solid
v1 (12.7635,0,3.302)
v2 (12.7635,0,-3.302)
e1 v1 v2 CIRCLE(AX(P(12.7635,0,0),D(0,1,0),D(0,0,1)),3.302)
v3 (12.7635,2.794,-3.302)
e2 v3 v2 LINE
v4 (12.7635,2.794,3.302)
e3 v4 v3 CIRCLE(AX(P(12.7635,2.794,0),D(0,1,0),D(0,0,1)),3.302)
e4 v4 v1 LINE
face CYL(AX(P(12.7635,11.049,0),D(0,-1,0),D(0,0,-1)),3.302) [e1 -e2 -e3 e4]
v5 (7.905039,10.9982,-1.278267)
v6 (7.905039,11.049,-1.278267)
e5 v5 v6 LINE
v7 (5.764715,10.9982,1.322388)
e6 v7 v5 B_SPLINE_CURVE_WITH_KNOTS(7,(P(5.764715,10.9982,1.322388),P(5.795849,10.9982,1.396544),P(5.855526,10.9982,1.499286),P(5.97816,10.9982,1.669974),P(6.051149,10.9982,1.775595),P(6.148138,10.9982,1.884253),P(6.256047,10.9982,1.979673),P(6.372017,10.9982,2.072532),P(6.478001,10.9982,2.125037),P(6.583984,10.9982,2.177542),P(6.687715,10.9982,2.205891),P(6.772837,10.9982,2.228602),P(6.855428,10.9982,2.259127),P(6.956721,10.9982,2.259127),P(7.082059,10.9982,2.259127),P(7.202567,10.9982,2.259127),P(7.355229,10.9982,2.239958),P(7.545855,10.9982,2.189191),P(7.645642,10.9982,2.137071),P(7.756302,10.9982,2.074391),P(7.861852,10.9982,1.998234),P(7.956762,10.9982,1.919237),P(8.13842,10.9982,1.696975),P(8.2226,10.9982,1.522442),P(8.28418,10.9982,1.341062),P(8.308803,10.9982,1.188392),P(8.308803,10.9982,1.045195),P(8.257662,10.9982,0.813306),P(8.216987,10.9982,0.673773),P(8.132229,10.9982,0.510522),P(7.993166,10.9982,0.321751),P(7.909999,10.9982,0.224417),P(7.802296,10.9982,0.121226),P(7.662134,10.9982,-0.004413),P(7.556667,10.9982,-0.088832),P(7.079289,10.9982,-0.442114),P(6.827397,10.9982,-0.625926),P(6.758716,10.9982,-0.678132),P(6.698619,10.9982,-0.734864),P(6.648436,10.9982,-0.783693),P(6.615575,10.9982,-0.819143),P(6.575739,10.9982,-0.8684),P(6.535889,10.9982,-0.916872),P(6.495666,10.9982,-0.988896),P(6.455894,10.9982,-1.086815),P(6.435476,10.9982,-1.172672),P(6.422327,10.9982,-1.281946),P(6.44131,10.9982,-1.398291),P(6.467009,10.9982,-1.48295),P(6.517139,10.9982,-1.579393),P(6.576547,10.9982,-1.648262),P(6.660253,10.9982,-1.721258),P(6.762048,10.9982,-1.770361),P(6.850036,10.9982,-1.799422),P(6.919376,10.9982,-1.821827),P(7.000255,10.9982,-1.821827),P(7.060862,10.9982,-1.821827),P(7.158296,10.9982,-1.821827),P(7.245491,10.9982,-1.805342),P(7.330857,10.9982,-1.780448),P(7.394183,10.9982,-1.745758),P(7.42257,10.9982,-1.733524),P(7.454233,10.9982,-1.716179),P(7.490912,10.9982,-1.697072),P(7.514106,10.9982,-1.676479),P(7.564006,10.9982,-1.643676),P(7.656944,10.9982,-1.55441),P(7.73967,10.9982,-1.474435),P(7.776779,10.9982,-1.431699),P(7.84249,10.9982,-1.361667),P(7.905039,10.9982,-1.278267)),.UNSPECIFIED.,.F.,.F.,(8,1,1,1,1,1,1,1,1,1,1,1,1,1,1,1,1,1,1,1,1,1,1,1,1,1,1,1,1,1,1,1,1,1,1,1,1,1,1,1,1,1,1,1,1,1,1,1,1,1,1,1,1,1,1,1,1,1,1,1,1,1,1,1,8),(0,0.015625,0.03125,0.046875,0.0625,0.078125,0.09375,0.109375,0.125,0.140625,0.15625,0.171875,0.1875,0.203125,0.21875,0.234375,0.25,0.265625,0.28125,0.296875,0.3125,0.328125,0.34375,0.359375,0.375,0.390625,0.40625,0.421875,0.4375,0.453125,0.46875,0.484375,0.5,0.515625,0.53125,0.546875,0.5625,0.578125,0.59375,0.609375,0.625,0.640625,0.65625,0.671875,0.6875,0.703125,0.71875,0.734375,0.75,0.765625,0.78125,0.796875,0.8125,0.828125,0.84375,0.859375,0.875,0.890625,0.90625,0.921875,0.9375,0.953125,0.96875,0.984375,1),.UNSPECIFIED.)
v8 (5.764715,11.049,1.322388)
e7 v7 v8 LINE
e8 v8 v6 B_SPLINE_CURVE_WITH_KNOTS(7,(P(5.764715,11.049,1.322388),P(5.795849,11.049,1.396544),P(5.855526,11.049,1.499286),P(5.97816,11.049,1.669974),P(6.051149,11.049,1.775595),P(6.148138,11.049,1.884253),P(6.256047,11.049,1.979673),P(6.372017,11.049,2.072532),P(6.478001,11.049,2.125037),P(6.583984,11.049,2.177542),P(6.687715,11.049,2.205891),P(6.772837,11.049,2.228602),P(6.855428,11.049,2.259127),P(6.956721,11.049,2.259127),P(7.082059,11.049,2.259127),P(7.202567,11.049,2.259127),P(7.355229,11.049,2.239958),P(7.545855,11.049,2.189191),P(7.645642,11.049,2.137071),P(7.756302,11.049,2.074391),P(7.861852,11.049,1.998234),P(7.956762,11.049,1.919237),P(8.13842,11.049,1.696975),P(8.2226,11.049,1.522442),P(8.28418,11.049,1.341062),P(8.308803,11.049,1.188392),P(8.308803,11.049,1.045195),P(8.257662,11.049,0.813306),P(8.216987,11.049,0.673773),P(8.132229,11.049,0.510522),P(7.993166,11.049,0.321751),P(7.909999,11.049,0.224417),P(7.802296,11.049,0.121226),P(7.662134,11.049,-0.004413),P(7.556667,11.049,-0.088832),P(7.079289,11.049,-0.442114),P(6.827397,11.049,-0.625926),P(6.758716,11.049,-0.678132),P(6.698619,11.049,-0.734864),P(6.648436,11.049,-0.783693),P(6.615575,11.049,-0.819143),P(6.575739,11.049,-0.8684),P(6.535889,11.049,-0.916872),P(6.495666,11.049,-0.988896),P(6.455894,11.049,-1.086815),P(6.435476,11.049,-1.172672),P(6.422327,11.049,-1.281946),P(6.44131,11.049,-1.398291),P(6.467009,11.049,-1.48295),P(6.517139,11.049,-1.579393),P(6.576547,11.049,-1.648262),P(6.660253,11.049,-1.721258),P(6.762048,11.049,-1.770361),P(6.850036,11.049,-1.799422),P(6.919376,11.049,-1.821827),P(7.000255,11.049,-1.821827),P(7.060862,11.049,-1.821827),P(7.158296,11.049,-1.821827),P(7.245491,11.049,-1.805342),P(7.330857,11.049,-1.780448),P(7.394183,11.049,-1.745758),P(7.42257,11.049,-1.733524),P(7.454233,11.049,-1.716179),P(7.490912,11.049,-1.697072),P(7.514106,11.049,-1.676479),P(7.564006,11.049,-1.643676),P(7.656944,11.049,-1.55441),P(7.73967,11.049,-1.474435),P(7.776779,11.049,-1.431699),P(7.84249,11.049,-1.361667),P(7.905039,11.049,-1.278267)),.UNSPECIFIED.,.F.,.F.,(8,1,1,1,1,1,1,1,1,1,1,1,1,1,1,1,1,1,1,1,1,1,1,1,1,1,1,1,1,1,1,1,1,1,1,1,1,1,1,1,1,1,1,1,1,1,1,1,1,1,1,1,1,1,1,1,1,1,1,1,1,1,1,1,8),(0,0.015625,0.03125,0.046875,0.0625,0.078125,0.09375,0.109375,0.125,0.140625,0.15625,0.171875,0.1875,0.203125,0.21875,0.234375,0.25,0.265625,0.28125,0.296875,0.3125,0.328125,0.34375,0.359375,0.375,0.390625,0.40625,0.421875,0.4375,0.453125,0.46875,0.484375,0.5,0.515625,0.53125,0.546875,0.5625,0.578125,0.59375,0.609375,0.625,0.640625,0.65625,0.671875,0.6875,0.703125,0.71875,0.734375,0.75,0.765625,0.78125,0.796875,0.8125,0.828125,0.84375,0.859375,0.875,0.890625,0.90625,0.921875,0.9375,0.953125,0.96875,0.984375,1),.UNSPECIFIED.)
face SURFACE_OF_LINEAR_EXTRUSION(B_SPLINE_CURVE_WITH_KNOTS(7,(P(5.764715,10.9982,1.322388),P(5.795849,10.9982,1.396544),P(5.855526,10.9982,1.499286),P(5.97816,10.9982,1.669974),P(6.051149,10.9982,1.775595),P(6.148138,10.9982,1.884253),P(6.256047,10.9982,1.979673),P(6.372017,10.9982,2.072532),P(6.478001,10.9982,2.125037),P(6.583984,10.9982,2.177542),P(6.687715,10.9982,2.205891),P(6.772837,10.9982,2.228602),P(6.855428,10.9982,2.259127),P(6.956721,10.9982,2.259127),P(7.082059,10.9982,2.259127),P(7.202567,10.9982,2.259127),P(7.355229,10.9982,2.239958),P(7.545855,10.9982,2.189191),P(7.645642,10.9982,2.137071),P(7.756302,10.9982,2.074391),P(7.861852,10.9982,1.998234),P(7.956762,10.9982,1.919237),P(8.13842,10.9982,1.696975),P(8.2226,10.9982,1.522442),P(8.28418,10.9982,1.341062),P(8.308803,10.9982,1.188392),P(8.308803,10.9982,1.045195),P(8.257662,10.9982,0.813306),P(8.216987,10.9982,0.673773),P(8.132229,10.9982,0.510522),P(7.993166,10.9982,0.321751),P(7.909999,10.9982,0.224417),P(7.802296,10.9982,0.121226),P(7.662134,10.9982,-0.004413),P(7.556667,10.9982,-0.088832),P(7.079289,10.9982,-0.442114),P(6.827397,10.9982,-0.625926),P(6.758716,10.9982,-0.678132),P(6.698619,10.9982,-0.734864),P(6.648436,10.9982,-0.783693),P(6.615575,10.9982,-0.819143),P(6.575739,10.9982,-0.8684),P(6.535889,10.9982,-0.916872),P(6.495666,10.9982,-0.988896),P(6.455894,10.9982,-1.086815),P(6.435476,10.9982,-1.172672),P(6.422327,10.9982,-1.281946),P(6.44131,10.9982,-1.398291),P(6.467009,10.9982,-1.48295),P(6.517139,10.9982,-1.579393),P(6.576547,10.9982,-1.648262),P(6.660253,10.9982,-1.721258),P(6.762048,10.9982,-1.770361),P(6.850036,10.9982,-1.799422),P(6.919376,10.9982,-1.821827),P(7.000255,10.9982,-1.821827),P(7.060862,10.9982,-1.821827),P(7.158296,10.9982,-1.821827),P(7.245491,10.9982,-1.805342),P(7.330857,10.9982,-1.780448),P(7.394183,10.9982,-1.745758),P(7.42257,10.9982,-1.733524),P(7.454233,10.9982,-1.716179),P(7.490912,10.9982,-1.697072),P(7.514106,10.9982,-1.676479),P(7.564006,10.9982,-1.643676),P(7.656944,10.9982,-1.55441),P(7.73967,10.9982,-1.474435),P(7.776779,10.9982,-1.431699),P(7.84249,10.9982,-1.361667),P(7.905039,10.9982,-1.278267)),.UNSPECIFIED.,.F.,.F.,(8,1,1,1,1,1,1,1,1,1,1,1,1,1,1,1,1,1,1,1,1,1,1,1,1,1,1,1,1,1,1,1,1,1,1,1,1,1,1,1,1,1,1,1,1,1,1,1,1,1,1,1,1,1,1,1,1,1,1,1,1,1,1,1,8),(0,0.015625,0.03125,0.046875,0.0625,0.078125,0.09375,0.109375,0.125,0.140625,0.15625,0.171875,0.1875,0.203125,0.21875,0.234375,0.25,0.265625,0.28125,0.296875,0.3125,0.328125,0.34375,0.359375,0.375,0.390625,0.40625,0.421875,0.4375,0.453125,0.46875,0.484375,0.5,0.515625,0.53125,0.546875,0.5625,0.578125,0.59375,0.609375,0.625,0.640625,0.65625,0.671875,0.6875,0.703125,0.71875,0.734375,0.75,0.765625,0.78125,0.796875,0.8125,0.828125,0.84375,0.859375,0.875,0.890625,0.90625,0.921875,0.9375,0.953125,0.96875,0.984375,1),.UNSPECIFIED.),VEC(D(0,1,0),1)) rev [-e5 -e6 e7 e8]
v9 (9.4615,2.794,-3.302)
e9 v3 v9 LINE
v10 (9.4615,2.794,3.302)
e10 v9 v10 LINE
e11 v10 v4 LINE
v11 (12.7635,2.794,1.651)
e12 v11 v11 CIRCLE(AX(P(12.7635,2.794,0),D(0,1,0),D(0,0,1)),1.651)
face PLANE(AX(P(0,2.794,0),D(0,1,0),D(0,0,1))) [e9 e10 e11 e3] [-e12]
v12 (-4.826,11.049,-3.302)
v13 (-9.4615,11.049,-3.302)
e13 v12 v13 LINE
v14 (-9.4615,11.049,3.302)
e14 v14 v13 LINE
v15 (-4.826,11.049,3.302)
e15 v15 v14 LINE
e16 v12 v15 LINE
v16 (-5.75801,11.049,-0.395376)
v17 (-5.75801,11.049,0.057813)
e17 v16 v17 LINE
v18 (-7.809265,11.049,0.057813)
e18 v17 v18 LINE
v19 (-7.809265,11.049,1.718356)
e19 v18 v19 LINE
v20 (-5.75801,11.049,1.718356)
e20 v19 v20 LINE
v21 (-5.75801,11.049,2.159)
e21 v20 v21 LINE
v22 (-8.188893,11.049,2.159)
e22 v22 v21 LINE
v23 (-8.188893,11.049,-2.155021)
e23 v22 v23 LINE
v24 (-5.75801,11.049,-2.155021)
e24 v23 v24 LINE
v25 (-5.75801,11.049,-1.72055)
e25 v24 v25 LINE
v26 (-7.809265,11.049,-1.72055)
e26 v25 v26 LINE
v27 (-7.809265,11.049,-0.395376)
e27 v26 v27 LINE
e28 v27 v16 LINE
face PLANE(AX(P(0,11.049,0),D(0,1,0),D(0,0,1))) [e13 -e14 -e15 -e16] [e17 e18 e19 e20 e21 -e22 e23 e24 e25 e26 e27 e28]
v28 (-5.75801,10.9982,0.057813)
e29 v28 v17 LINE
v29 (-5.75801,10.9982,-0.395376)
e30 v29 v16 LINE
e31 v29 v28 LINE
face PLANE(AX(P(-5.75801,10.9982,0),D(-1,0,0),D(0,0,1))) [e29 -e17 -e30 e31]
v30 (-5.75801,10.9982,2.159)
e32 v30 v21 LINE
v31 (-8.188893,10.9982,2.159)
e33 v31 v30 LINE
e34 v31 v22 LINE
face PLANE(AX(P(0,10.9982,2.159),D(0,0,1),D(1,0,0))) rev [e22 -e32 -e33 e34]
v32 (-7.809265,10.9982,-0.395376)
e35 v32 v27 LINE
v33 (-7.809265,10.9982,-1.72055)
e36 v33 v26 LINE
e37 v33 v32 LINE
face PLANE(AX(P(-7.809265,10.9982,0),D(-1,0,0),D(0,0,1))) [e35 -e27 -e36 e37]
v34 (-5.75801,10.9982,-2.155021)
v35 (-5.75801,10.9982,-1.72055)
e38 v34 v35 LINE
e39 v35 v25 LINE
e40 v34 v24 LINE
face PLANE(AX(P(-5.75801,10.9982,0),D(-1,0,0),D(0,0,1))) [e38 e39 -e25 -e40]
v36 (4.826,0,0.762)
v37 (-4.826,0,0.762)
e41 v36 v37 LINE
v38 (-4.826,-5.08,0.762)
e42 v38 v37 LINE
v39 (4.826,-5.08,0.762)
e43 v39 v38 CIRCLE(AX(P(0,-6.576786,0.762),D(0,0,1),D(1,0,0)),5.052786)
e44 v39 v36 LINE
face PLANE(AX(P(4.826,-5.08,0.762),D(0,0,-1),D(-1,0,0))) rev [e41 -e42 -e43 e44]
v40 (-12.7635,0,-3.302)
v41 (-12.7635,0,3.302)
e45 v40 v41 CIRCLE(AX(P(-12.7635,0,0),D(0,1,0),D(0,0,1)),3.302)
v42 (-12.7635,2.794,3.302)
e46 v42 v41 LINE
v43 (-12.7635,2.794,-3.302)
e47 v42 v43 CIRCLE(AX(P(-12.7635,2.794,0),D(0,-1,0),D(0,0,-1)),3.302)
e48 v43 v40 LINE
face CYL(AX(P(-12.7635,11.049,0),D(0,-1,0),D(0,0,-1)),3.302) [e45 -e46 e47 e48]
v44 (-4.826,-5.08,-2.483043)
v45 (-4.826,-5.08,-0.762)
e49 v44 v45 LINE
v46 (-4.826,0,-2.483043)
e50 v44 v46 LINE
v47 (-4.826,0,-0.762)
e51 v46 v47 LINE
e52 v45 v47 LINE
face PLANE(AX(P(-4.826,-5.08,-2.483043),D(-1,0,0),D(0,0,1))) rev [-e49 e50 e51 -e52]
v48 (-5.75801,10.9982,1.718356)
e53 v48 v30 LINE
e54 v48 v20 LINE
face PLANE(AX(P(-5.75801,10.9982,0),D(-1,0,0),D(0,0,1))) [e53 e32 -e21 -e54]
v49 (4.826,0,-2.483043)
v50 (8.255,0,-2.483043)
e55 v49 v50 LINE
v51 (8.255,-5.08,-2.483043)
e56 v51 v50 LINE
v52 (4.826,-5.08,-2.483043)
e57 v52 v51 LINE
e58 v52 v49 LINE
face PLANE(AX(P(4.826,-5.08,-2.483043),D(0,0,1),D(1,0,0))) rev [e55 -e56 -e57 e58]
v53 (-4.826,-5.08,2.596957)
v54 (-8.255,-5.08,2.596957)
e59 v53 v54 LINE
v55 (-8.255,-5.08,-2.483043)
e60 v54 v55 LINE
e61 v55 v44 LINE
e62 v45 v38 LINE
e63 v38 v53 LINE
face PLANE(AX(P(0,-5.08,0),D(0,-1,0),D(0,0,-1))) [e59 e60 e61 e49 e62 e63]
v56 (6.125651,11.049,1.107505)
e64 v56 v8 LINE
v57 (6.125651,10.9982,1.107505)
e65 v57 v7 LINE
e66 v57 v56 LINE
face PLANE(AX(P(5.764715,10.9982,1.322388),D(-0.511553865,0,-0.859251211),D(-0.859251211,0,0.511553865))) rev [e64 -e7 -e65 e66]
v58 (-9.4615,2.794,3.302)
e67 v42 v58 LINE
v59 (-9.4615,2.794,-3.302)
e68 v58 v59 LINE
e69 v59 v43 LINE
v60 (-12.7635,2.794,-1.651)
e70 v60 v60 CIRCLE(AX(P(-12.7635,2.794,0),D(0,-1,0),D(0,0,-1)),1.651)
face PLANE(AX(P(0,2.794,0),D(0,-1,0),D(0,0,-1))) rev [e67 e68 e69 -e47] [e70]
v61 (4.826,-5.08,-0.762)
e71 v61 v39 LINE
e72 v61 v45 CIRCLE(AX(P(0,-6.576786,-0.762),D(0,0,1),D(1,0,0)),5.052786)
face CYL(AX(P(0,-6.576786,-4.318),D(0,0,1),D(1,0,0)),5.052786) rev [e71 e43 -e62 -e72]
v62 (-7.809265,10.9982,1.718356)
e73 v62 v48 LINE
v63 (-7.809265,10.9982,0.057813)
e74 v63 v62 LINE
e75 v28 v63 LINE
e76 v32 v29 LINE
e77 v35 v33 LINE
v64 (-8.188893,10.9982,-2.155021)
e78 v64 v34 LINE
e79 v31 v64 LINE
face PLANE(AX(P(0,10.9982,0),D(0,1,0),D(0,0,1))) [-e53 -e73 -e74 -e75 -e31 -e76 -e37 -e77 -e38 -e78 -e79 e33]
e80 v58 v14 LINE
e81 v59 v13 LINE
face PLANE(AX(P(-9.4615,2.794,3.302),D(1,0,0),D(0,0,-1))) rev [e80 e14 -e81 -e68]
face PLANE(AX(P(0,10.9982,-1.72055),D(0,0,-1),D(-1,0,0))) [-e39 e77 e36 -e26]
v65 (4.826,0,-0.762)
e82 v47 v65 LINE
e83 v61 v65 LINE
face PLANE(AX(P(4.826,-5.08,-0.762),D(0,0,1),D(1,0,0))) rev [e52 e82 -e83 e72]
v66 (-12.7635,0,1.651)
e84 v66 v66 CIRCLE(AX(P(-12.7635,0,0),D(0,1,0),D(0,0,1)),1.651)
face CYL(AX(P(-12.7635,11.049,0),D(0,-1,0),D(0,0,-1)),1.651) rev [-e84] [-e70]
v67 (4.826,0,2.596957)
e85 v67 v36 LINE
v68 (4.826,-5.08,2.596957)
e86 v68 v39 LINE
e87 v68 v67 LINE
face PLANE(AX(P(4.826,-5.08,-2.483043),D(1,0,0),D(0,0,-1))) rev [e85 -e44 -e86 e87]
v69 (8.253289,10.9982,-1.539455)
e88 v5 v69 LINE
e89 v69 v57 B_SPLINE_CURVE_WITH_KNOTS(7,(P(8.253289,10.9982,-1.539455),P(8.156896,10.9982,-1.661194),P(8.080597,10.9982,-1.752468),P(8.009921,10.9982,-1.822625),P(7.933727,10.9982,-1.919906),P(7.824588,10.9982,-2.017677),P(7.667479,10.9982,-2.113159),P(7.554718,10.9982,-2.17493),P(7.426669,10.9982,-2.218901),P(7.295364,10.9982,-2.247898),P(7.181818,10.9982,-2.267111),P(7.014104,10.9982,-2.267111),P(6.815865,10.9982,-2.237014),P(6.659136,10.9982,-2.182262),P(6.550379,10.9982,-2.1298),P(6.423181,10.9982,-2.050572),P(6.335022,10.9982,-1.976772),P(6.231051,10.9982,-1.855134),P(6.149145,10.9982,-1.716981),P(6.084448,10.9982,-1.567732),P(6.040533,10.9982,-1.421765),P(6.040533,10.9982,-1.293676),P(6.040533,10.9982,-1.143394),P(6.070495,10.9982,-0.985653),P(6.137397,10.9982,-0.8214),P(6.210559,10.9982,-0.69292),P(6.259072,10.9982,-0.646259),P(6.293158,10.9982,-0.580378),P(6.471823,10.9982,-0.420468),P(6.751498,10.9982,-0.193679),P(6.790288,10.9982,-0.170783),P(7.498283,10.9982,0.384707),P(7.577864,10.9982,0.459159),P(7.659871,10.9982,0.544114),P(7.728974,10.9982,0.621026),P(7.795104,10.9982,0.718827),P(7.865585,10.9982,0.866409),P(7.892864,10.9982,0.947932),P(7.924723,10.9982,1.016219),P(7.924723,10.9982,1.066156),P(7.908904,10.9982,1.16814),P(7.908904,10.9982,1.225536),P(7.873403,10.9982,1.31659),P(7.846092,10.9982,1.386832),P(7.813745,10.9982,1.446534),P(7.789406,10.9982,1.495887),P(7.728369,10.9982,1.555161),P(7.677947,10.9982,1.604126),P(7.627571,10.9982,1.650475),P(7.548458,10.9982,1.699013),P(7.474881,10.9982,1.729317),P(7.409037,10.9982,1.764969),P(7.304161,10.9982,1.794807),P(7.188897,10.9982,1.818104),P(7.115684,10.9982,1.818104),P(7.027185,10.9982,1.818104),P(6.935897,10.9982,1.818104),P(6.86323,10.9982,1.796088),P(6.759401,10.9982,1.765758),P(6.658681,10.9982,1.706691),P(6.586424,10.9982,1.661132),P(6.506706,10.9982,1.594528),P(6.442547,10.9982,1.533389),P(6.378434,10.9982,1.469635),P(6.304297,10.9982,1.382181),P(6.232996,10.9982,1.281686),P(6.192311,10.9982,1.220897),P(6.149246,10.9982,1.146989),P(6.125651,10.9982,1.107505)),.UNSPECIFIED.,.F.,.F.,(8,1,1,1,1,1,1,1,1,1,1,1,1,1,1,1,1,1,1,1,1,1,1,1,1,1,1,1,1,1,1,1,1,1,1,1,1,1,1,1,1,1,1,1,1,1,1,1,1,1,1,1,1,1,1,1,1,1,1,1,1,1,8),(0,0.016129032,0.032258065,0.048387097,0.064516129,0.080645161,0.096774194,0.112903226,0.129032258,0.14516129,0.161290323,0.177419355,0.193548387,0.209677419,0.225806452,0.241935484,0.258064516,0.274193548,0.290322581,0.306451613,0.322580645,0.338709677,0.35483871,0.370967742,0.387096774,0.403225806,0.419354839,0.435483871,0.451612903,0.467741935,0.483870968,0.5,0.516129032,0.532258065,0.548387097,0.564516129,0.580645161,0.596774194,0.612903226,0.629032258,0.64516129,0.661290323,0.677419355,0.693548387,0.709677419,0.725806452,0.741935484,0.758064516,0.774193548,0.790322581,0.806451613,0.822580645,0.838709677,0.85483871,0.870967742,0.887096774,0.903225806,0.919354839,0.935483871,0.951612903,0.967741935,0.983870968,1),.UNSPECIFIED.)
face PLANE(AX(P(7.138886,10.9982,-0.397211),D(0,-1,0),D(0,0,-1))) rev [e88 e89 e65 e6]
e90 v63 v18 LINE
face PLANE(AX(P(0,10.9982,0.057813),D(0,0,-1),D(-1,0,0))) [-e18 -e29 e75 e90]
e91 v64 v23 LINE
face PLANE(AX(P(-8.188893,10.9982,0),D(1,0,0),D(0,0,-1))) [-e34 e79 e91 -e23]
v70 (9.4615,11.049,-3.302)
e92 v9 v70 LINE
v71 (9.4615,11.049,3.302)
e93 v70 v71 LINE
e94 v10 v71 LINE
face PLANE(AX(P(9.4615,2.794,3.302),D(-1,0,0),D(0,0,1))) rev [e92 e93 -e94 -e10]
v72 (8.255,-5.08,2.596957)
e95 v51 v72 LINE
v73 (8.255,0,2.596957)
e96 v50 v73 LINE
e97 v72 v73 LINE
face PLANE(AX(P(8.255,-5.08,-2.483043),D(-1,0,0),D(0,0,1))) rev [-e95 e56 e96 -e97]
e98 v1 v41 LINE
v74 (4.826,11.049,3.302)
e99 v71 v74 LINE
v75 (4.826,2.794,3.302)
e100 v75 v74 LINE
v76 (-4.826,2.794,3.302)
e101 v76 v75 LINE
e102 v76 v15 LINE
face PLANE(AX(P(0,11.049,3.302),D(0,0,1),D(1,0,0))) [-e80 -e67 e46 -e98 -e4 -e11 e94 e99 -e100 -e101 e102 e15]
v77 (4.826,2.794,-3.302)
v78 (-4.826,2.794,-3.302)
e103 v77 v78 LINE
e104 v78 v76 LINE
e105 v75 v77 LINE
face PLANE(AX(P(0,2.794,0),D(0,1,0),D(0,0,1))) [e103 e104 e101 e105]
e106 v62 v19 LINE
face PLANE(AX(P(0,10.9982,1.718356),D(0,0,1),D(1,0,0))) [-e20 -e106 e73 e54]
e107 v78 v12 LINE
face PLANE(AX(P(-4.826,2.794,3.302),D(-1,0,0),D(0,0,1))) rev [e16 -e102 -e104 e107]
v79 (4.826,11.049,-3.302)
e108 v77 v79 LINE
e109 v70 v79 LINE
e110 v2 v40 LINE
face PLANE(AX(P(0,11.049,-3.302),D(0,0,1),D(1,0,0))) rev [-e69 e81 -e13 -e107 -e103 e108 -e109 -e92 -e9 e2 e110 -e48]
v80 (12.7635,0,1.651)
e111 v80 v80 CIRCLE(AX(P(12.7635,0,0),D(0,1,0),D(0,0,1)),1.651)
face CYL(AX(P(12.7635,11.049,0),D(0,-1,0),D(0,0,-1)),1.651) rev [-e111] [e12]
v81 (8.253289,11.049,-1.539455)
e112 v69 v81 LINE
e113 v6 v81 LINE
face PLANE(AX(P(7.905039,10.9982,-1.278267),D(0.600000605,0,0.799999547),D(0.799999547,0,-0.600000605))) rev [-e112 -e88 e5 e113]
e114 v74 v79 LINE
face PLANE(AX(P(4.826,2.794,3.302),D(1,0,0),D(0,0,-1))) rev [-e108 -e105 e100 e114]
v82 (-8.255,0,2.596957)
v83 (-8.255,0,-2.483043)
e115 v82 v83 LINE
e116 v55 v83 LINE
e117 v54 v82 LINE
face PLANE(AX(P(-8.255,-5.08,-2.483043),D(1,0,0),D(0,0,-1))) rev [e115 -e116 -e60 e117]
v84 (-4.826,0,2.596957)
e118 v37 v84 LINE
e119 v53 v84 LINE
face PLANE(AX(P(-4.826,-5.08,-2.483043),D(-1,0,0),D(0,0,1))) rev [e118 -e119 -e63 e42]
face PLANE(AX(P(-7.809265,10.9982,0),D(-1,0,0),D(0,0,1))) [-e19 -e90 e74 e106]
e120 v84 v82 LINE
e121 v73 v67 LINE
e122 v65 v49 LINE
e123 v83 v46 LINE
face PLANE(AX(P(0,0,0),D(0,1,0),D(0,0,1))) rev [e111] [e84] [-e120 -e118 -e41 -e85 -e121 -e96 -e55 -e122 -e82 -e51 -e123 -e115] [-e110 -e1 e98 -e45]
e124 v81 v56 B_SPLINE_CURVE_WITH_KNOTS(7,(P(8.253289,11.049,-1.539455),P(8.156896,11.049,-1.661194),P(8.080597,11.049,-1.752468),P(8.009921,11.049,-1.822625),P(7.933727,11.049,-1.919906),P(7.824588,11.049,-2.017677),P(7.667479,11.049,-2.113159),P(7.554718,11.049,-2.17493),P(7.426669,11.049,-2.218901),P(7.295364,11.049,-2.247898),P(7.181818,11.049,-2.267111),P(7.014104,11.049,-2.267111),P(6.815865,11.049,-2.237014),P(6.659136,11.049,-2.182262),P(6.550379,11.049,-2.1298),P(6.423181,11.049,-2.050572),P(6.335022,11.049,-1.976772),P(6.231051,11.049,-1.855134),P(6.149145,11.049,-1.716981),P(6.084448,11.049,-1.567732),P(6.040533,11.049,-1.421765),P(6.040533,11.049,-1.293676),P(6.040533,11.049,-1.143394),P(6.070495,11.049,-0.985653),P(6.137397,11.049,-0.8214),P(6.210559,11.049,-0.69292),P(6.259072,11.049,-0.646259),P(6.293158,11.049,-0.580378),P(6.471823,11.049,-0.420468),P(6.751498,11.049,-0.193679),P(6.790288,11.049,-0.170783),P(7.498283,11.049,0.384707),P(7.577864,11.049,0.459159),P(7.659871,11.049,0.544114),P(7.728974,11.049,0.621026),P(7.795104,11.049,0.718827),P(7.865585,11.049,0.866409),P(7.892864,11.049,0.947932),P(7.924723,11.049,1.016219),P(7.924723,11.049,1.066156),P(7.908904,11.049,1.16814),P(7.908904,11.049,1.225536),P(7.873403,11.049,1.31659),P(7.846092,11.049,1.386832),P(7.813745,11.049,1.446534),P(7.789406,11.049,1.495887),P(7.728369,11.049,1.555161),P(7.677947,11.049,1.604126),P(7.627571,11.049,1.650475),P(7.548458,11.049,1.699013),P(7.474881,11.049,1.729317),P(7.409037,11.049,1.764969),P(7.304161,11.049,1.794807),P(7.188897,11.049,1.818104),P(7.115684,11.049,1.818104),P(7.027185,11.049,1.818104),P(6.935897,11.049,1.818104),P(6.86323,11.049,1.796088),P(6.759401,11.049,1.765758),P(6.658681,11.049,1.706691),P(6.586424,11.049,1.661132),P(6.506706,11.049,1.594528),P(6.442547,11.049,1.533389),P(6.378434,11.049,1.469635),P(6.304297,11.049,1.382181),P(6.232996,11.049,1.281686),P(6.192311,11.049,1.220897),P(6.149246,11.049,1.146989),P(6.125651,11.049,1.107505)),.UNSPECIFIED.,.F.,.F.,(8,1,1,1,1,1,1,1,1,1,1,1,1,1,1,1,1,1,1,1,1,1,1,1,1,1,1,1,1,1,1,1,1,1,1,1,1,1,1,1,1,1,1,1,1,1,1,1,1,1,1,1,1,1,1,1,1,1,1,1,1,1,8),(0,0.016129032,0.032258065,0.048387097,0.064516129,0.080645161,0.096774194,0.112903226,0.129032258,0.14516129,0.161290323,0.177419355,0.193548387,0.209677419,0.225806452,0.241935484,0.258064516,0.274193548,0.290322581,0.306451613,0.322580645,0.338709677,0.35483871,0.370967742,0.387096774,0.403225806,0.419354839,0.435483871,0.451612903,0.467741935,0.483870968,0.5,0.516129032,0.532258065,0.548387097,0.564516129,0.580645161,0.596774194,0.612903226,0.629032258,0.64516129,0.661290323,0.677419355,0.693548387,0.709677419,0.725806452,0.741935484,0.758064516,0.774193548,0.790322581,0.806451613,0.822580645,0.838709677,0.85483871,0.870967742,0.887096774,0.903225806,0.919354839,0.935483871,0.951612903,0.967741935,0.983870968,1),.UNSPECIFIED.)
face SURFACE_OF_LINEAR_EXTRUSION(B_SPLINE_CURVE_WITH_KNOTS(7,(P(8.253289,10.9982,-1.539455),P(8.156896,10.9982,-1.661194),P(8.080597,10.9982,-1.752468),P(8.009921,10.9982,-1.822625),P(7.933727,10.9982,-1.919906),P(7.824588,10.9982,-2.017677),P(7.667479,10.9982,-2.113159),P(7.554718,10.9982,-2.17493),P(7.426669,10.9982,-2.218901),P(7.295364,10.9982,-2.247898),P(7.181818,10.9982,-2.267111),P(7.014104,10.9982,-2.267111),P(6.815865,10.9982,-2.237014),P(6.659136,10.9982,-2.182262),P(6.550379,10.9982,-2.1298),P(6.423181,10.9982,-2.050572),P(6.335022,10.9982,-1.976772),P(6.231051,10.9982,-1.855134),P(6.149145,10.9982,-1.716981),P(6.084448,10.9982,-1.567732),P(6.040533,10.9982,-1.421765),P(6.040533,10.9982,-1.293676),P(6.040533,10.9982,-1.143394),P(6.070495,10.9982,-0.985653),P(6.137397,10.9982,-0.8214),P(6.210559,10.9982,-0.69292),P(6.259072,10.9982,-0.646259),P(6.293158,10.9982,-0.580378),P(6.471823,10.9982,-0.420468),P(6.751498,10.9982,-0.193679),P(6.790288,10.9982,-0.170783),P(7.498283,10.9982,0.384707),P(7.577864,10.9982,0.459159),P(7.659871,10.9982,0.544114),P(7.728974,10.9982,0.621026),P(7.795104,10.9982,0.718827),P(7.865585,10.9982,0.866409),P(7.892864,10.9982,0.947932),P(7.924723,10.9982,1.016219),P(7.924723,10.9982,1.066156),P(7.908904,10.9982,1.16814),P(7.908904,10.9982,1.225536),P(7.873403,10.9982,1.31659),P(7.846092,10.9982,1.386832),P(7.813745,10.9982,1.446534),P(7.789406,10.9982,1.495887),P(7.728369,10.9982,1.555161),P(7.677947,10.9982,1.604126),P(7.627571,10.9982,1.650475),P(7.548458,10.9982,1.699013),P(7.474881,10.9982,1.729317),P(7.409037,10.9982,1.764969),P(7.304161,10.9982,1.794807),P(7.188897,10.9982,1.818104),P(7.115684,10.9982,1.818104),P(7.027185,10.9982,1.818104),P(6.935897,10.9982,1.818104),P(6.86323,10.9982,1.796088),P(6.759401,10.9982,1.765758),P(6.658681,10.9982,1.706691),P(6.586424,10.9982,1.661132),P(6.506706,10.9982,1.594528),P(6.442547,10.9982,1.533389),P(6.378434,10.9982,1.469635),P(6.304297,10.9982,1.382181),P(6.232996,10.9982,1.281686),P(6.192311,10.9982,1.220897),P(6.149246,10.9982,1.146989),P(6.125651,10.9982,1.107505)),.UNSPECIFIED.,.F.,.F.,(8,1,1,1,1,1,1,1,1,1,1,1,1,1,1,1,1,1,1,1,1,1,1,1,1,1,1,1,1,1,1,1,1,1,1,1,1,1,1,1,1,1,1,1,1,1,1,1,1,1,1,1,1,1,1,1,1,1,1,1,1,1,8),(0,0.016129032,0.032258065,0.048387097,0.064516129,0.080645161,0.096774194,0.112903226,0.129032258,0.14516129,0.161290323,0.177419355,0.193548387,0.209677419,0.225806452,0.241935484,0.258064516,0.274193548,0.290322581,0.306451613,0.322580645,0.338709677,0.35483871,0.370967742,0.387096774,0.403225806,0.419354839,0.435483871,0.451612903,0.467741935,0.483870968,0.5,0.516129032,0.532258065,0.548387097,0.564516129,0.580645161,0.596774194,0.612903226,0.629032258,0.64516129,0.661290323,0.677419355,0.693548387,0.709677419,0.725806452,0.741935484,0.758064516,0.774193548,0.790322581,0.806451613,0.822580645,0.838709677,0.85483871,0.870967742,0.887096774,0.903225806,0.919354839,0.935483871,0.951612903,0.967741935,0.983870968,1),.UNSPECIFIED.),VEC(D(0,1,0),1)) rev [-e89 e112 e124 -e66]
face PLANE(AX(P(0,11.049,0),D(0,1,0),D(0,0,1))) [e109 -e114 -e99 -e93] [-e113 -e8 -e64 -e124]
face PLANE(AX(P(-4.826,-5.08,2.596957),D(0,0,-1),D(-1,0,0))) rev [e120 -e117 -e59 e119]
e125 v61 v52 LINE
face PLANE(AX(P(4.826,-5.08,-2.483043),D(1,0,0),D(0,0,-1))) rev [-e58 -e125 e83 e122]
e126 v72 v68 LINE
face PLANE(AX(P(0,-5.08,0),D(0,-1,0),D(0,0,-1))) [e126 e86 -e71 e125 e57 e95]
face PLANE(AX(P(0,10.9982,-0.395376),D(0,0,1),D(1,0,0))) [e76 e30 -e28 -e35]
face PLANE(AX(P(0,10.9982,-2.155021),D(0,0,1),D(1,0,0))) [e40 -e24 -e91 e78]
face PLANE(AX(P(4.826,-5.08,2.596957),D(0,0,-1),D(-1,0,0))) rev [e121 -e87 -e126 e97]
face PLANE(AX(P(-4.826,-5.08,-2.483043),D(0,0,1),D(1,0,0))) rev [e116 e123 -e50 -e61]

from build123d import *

# Parameters (mm, degrees)
BOSS_EXTRUDE3_DEPTH = 11.049
SKETCH2_W           = 9.652
SKETCH2_H           = 6.604
SKETCH2_W_2         = 6.604
CUT_EXTRUDE1_DEPTH  = 8.255
SKETCH5_W           = 3.429
SKETCH5_H           = 5.08
BOSS_EXTRUDE4_DEPTH = 5.08
SKETCH6_W           = 9.652
SKETCH6_H           = 1.524
BOSS_EXTRUDE5_DEPTH = 5.08
CUT_EXTRUDE3_DEPTH  = 5.08
CUT_EXTRUDE4_START  = -0.0508
CUT_EXTRUDE4_DEPTH  = 0.0508
CUT_EXTRUDE5_DEPTH  = 0.0508


# Read off the part's stored shape, not the designer's step: Cut-Extrude4
with BuildPart() as part:
    # Sketch1 → Boss-Extrude3 (new body)
    with BuildSketch(Plane(origin=(0, 0, 0), x_dir=(1, 0, 0), z_dir=(0, 1, 0))):
        with BuildLine():
            ThreePointArc((-12.7635, 3.302), (-16.0655, 0), (-12.7635, -3.302))
            Line((-12.7635, -3.302), (-12.7635, -1.651))
            ThreePointArc((-12.7635, -1.651), (-14.4145, 0), (-12.7635, 1.651))
            Line((-12.7635, 1.651), (-12.7635, 3.302))
        make_face()
        with BuildLine():
            Line((-12.7635, -1.651), (-12.7635, -3.302))
            ThreePointArc((-12.7635, -3.302), (-10.428633409, -2.334866591), (-9.4615, 0))
            ThreePointArc((-9.4615, 0), (-10.428633409, 2.334866591), (-12.7635, 3.302))
            Line((-12.7635, 3.302), (-12.7635, 1.651))
            ThreePointArc((-12.7635, 1.651), (-11.596066704, 1.167433296), (-11.1125, 0))
            ThreePointArc((-11.1125, 0), (-11.596066704, -1.167433296), (-12.7635, -1.651))
        make_face()
        with BuildLine():
            Line((-12.7635, -3.302), (12.7635, -3.302))
            ThreePointArc((12.7635, -3.302), (9.4615, 0), (12.7635, 3.302))
            Line((12.7635, 3.302), (-12.7635, 3.302))
            ThreePointArc((-12.7635, 3.302), (-10.428633409, 2.334866591), (-9.4615, 0))
            ThreePointArc((-9.4615, 0), (-10.428633409, -2.334866591), (-12.7635, -3.302))
        make_face()
        with BuildLine():
            ThreePointArc((12.7635, 3.302), (9.4615, 0), (12.7635, -3.302))
            Line((12.7635, -3.302), (12.7635, -1.651))
            ThreePointArc((12.7635, -1.651), (11.1125, 0), (12.7635, 1.651))
            Line((12.7635, 1.651), (12.7635, 3.302))
        make_face()
        with BuildLine():
            Line((12.7635, -1.651), (12.7635, -3.302))
            ThreePointArc((12.7635, -3.302), (15.098366591, -2.334866591), (16.0655, 0))
            ThreePointArc((16.0655, 0), (15.098366591, 2.334866591), (12.7635, 3.302))
            Line((12.7635, 3.302), (12.7635, 1.651))
            ThreePointArc((12.7635, 1.651), (13.930933296, 1.167433296), (14.4145, 0))
            ThreePointArc((14.4145, 0), (13.930933296, -1.167433296), (12.7635, -1.651))
        make_face()
    extrude(amount=BOSS_EXTRUDE3_DEPTH)

    # Sketch2 → Cut-Extrude1 (cut)
    with BuildSketch(Plane(origin=(0, 11.049, 0), x_dir=(1, 0, 0), z_dir=(0, 1, 0))):
        Rectangle(SKETCH2_W, SKETCH2_H)
        with Locations((12.7635, 0)):
            Rectangle(SKETCH2_W_2, SKETCH2_H)
        with Locations((-12.7635, 0)):
            Rectangle(SKETCH2_W_2, SKETCH2_H)
    extrude(amount=-CUT_EXTRUDE1_DEPTH, mode=Mode.SUBTRACT)

    # Sketch5 → Boss-Extrude4 (add)
    with BuildSketch(Plane.XZ):
        with Locations((6.5405, 0.056957201)):
            Rectangle(SKETCH5_W, SKETCH5_H)
        with Locations((-6.5405, 0.056957201)):
            Rectangle(SKETCH5_W, SKETCH5_H)
    extrude(amount=BOSS_EXTRUDE4_DEPTH)

    # Sketch6 → Boss-Extrude5 (add)
    with BuildSketch(Plane.XZ):
        Rectangle(SKETCH6_W, SKETCH6_H)
    extrude(amount=BOSS_EXTRUDE5_DEPTH)

    # Sketch7 → Cut-Extrude3 (cut)
    with BuildSketch(Plane.XY.offset(0.762)):
        with BuildLine():
            ThreePointArc((-4.826, -5.08), (-0.756934481, -11.57255329), (5.052785714, -6.576785714))
            ThreePointArc((5.052785714, -6.576785714), (4.995767575, -5.819851233), (4.826, -5.08))
            Line((4.826, -5.08), (-4.826, -5.08))
        make_face()
        with BuildLine():
            Line((-4.826, -5.08), (4.826, -5.08))
            ThreePointArc((4.826, -5.08), (2.997307625, -2.50901108), (0, -1.524))
            ThreePointArc((0, -1.524), (-2.997307625, -2.50901108), (-4.826, -5.08))
        make_face()
    extrude(amount=-CUT_EXTRUDE3_DEPTH, mode=Mode.SUBTRACT)

    # Cut-Extrude4 outline → Cut-Extrude4 (cut)
    with BuildSketch(Plane(origin=(0, 11.049, 0), x_dir=(1, 0, 0), z_dir=(0, 1, 0)).offset(CUT_EXTRUDE4_START)):
        with BuildLine():
            Line((6.125651291, -1.107505234), (5.764715133, -1.322388012))
            add(Edge.make_bspline(
                [(5.764715133, -1.322388012), (5.795848726, -1.396544386), (5.855526361, -1.499286266), (5.978159662, -1.669974458), (6.05114933, -1.775594986), (6.148137968, -1.884253365), (6.256046735, -1.979672728), (6.372017343, -2.072531851), (6.478000588, -2.125037114), (6.583983834, -2.177542378), (6.687715089, -2.205891048), (6.772837481, -2.228601824), (6.855428053, -2.259126551), (6.956720766, -2.259126551), (7.082059087, -2.259126551), (7.202566961, -2.259126551), (7.355228923, -2.239958049), (7.545854824, -2.189191034), (7.64564176, -2.137070791), (7.756302185, -2.074391176), (7.861852333, -1.998233742), (7.956762183, -1.91923746), (8.138419792, -1.696975289), (8.222600111, -1.522442374), (8.284179667, -1.341062147), (8.308803358, -1.188392086), (8.308803358, -1.045195403), (8.257662319, -0.813306269), (8.216986985, -0.673773492), (8.132229192, -0.510521819), (7.993166094, -0.321750968), (7.909998502, -0.224416829), (7.802295587, -0.121226034), (7.6621337, 0.004412918), (7.5566666, 0.088832099), (7.079288797, 0.442114266), (6.827397054, 0.625925615), (6.758715893, 0.678132356), (6.698618911, 0.734864272), (6.648436244, 0.783693405), (6.615575385, 0.819143072), (6.575738864, 0.868399704), (6.535888686, 0.916871649), (6.495665853, 0.988895848), (6.455893708, 1.086814708), (6.435475968, 1.172671893), (6.422326559, 1.281945673), (6.441309585, 1.39829107), (6.467008859, 1.482949614), (6.517139065, 1.57939298), (6.576546974, 1.648262165), (6.660252521, 1.721257683), (6.76204807, 1.770361107), (6.850036001, 1.799422275), (6.919376094, 1.821827394), (7.000254698, 1.821827394), (7.060862271, 1.821827394), (7.158295762, 1.821827394), (7.245490979, 1.805342484), (7.330857485, 1.780448172), (7.394182968, 1.74575823), (7.422569964, 1.733524046), (7.454232705, 1.716179075), (7.490911825, 1.697072046), (7.514106284, 1.676478569), (7.564005826, 1.643675962), (7.656944095, 1.554409737), (7.739669602, 1.474435351), (7.776778642, 1.43169931), (7.842489762, 1.361666912), (7.905039475, 1.278267425)],
                knots=[0, 0, 0, 0, 0, 0, 0, 0, 0.015625, 0.03125, 0.046875, 0.0625, 0.078125, 0.09375, 0.109375, 0.125, 0.140625, 0.15625, 0.171875, 0.1875, 0.203125, 0.21875, 0.234375, 0.25, 0.265625, 0.28125, 0.296875, 0.3125, 0.328125, 0.34375, 0.359375, 0.375, 0.390625, 0.40625, 0.421875, 0.4375, 0.453125, 0.46875, 0.484375, 0.5, 0.515625, 0.53125, 0.546875, 0.5625, 0.578125, 0.59375, 0.609375, 0.625, 0.640625, 0.65625, 0.671875, 0.6875, 0.703125, 0.71875, 0.734375, 0.75, 0.765625, 0.78125, 0.796875, 0.8125, 0.828125, 0.84375, 0.859375, 0.875, 0.890625, 0.90625, 0.921875, 0.9375, 0.953125, 0.96875, 0.984375, 1, 1, 1, 1, 1, 1, 1, 1], degree=7))
            Line((7.905039475, 1.278267425), (8.253289165, 1.539455103))
            add(Edge.make_bspline(
                [(8.253289165, 1.539455103), (8.156895883, 1.66119447), (8.080596703, 1.752467641), (8.009921379, 1.822625174), (7.933726759, 1.919905891), (7.824588167, 2.017677373), (7.667478791, 2.113158926), (7.554717937, 2.174929753), (7.426668873, 2.21890102), (7.295363504, 2.247898039), (7.181818455, 2.267110724), (7.014103692, 2.267110724), (6.815864787, 2.237013824), (6.659136337, 2.182262131), (6.55037867, 2.129800369), (6.423181047, 2.050572345), (6.335021768, 1.976771869), (6.231051482, 1.855134106), (6.149145224, 1.716981286), (6.084448013, 1.567732126), (6.040533381, 1.421764923), (6.040533381, 1.293676397), (6.040533381, 1.143393573), (6.070495088, 0.985652762), (6.137396877, 0.821399612), (6.210558512, 0.692920171), (6.259072046, 0.646259485), (6.293158014, 0.580378426), (6.471822739, 0.420467618), (6.75149803, 0.193678775), (6.790287956, 0.170783169), (7.498283405, -0.384707414), (7.577864327, -0.459159137), (7.65987138, -0.544113603), (7.728973771, -0.621025877), (7.79510367, -0.718827072), (7.865584999, -0.866409444), (7.892864321, -0.947931981), (7.924722723, -1.016219237), (7.924722723, -1.066155835), (7.908904135, -1.168139886), (7.908904135, -1.225535848), (7.873403325, -1.31658975), (7.846091508, -1.386832441), (7.81374531, -1.446533535), (7.789405983, -1.495887306), (7.72836903, -1.555160993), (7.677947198, -1.604126212), (7.627570897, -1.65047546), (7.548458311, -1.699013274), (7.474880936, -1.729316994), (7.409037252, -1.764969223), (7.304160871, -1.794806682), (7.188897018, -1.818103802), (7.115683884, -1.818103802), (7.027185487, -1.818103802), (6.93589672, -1.818103802), (6.863229947, -1.796088084), (6.759400758, -1.765758188), (6.658680651, -1.706691455), (6.586423649, -1.661131989), (6.506706136, -1.594528182), (6.442547065, -1.533389449), (6.378433525, -1.469634745), (6.304296754, -1.382180872), (6.232995884, -1.281685995), (6.192311068, -1.220896958), (6.149245652, -1.146989207), (6.125651291, -1.107505234)],
                knots=[0, 0, 0, 0, 0, 0, 0, 0, 0.016129032, 0.032258065, 0.048387097, 0.064516129, 0.080645161, 0.096774194, 0.112903226, 0.129032258, 0.14516129, 0.161290323, 0.177419355, 0.193548387, 0.209677419, 0.225806452, 0.241935484, 0.258064516, 0.274193548, 0.290322581, 0.306451613, 0.322580645, 0.338709677, 0.35483871, 0.370967742, 0.387096774, 0.403225806, 0.419354839, 0.435483871, 0.451612903, 0.467741935, 0.483870968, 0.5, 0.516129032, 0.532258065, 0.548387097, 0.564516129, 0.580645161, 0.596774194, 0.612903226, 0.629032258, 0.64516129, 0.661290323, 0.677419355, 0.693548387, 0.709677419, 0.725806452, 0.741935484, 0.758064516, 0.774193548, 0.790322581, 0.806451613, 0.822580645, 0.838709677, 0.85483871, 0.870967742, 0.887096774, 0.903225806, 0.919354839, 0.935483871, 0.951612903, 0.967741935, 0.983870968, 1, 1, 1, 1, 1, 1, 1, 1], degree=7))
        make_face()
    extrude(amount=CUT_EXTRUDE4_DEPTH, mode=Mode.SUBTRACT)

    # Sketch10 → Cut-Extrude5 (cut)
    with BuildSketch(Plane(origin=(0, 11.049, 0), x_dir=(1, 0, 0), z_dir=(0, 1, 0))):
        Polygon((-5.758009801, 2.155020867), (-5.758009801, 1.720550301), (-7.809265142, 1.720550301), (-7.809265142, 0.395375626), (-5.758009801, 0.395375626), (-5.758009801, -0.057812947), (-7.809265142, -0.057812947), (-7.809265142, -1.718355868), (-5.758009801, -1.718355868), (-5.758009801, -2.159), (-8.188893002, -2.159), (-8.188893002, 2.155020867), align=None)
    extrude(amount=-CUT_EXTRUDE5_DEPTH, mode=Mode.SUBTRACT)


solid = part.part
